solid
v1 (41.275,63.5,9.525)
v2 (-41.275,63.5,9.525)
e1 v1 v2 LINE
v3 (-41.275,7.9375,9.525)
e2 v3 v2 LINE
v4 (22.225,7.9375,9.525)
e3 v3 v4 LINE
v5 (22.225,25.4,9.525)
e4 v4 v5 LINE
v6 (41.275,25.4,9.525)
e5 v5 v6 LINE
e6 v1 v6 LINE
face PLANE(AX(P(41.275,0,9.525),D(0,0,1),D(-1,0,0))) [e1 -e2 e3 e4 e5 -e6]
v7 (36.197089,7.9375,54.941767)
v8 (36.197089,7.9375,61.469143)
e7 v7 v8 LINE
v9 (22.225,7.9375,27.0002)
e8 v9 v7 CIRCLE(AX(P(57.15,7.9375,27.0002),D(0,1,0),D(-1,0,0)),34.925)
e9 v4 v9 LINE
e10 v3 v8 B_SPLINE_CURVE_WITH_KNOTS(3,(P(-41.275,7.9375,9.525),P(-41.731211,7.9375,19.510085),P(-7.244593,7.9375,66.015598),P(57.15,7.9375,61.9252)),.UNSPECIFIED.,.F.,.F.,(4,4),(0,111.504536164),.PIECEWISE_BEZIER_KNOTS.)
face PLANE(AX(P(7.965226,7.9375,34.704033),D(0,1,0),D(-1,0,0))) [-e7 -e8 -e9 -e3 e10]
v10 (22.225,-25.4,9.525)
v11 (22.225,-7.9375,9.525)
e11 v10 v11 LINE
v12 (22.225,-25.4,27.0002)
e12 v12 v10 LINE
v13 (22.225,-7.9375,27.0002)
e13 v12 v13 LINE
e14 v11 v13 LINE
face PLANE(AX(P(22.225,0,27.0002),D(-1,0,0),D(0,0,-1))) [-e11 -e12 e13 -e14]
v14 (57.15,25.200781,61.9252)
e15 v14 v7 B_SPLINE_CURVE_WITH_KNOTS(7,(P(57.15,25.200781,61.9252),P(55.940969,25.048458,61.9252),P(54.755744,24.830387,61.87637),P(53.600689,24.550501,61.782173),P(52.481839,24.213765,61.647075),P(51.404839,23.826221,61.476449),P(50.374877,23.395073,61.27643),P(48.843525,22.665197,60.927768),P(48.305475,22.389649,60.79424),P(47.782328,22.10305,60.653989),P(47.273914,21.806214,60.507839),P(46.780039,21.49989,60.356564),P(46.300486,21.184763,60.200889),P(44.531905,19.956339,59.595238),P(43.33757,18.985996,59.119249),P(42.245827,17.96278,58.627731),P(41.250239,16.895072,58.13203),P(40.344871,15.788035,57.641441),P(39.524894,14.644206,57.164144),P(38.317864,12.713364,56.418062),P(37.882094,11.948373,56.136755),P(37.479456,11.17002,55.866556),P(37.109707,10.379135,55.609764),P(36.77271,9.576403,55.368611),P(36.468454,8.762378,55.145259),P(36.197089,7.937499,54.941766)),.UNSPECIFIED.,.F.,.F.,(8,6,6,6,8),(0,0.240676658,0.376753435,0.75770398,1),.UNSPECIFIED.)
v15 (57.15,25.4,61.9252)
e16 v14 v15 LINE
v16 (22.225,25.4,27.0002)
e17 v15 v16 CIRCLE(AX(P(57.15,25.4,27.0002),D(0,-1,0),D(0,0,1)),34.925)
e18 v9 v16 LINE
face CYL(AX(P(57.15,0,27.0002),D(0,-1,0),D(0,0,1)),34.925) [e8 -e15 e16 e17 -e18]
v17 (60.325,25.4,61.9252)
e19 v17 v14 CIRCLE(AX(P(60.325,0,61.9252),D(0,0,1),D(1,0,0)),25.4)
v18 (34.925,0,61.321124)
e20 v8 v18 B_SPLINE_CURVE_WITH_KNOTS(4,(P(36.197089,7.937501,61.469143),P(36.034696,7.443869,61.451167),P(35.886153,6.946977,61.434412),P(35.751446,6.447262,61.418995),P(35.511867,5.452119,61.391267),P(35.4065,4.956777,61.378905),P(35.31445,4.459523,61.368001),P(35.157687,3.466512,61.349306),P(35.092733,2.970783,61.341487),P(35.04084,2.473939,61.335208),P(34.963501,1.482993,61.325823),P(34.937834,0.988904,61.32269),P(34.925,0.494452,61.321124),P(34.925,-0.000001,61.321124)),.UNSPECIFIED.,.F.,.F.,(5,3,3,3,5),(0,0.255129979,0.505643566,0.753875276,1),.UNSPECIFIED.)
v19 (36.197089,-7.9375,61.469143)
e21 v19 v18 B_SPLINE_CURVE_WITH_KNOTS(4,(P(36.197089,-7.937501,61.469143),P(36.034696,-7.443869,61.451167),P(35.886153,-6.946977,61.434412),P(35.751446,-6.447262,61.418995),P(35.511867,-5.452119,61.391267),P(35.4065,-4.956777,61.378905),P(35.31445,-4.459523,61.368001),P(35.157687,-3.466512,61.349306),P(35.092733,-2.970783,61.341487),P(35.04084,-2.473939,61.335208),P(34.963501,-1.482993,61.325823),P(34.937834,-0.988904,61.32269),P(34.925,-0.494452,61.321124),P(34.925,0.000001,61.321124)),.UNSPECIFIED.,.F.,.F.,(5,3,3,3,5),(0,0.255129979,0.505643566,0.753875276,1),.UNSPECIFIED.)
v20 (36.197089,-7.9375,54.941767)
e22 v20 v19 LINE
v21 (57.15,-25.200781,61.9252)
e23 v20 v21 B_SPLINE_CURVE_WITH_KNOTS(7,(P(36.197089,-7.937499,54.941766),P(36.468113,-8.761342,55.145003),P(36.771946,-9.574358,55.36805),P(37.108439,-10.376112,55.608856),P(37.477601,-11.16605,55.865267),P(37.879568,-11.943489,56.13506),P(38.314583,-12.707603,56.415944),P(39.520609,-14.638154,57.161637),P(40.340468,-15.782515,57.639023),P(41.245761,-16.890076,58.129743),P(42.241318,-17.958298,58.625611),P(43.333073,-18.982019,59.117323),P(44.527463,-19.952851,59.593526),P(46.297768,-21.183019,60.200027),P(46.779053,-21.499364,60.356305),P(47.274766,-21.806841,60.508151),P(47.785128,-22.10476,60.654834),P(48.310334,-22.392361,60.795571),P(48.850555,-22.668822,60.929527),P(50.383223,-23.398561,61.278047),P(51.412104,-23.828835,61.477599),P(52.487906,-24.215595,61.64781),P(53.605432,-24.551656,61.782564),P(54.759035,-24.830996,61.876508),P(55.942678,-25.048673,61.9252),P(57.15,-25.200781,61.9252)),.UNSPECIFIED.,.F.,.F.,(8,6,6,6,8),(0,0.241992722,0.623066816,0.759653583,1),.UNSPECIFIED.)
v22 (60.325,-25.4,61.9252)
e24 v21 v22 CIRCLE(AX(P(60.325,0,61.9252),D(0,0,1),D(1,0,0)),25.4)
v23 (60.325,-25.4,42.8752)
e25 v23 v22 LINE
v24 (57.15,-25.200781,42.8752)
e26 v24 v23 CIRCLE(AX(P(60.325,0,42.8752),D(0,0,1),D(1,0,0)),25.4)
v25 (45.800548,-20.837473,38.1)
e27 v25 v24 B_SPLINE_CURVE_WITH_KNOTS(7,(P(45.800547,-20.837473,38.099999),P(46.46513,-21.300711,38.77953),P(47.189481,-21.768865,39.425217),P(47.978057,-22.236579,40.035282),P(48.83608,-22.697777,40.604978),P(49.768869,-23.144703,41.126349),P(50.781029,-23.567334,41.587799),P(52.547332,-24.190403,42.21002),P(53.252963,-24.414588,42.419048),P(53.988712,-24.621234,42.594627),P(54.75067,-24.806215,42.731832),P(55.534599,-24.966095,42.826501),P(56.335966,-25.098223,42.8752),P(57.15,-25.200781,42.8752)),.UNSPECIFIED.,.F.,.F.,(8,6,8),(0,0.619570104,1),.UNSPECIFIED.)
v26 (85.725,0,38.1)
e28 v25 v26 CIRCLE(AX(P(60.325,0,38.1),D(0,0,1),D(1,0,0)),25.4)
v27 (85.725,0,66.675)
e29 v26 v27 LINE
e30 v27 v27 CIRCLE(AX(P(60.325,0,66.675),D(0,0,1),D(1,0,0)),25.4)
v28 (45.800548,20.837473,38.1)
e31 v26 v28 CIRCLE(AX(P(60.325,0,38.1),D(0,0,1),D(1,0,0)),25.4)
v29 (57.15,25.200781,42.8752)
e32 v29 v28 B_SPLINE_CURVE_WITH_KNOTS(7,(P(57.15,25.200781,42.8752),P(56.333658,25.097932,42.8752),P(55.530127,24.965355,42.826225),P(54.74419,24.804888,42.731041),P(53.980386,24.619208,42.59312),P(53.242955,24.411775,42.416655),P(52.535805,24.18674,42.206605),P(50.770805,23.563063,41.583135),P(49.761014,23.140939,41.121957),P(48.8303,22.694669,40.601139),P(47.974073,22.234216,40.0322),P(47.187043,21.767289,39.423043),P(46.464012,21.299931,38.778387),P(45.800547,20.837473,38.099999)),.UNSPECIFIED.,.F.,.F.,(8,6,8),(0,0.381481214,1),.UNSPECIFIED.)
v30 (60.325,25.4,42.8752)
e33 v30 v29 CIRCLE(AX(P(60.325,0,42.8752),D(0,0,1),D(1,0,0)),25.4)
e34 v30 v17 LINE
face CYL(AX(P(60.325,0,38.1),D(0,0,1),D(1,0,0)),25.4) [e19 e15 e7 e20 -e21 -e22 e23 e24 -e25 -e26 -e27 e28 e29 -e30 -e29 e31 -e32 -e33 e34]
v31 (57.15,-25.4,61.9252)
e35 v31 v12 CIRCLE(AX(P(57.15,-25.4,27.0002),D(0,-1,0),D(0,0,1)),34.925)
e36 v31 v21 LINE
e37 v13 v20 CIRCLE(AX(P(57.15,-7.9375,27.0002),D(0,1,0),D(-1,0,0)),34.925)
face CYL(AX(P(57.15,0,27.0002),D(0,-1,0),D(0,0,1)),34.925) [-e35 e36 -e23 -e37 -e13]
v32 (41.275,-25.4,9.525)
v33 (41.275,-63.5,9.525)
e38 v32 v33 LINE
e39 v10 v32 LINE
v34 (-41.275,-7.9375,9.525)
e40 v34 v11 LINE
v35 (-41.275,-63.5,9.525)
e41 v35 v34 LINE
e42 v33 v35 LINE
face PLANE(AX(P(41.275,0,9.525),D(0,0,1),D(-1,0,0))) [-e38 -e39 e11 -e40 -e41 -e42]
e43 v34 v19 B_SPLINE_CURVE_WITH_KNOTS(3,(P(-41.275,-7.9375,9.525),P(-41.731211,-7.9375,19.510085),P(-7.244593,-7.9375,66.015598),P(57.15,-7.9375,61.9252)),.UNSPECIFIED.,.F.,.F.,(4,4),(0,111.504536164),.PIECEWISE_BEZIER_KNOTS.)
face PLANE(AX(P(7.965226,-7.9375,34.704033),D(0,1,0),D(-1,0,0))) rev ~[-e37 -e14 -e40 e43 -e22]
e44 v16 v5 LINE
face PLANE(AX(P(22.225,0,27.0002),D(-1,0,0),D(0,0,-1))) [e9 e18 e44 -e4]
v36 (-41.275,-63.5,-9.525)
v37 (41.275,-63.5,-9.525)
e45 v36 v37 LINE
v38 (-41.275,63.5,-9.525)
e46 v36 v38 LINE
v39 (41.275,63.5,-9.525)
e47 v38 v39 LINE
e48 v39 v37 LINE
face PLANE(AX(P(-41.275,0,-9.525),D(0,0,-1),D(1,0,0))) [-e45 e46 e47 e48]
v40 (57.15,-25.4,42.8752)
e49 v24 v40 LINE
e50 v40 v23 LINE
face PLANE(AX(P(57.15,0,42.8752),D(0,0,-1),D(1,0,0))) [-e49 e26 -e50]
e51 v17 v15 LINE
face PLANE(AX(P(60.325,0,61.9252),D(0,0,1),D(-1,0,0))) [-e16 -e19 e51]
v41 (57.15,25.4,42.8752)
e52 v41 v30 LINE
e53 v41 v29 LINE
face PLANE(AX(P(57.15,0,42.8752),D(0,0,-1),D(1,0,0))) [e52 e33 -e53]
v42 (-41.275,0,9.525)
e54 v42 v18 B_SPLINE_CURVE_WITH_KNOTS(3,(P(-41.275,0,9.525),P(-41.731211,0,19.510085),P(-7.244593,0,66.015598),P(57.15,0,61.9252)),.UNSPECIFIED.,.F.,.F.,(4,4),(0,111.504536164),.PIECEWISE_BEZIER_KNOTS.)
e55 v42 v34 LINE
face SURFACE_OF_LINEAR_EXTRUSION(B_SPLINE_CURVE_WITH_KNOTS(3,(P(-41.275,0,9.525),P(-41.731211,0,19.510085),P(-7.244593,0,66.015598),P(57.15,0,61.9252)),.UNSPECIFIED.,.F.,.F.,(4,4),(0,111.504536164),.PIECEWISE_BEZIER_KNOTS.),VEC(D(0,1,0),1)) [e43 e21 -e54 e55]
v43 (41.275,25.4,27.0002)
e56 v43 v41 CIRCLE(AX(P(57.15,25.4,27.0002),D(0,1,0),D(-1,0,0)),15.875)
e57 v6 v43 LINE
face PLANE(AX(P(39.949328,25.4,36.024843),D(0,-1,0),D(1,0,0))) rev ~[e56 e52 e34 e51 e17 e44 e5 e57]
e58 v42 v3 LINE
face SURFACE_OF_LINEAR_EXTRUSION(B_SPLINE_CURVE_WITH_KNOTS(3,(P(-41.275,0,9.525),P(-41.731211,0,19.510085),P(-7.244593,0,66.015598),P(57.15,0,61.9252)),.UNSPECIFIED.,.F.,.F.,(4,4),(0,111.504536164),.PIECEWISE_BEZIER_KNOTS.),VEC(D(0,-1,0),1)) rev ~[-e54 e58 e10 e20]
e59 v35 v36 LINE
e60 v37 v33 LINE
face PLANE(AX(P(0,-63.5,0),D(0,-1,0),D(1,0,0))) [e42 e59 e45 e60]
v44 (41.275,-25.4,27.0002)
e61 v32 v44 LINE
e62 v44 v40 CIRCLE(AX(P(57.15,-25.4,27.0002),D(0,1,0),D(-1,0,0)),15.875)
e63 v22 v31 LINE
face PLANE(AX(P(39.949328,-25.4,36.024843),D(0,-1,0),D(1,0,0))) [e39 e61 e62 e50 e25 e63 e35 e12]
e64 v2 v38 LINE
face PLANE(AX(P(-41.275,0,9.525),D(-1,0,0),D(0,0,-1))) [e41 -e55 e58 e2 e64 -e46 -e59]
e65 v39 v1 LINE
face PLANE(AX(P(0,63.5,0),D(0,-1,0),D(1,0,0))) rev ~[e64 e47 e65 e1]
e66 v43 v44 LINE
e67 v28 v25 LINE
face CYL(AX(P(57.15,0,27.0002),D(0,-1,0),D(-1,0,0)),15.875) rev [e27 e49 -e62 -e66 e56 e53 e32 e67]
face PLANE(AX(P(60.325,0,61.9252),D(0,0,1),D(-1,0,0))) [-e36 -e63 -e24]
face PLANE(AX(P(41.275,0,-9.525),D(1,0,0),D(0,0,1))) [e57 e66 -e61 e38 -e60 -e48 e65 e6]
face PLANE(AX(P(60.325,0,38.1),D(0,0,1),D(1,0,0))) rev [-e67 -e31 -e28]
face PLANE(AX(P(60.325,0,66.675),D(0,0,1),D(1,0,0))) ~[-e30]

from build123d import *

# Parameters (mm, degrees)
F1_DEPTH = 63.5
F2_DEPTH = 25.4
F3_DEPTH = 7.9375
F0_W     = 25.4
F0_H     = 4.7498
F0_H_2   = 19.05
F0_H_3   = 4.7752


# Not quite as in the source:
# - a feature names something its author has since deleted; it is built from what else it names


with BuildPart() as f1:
    # F0 (on Front) → F1 (new body, symmetric)
    with BuildSketch(Plane.XZ):
        Polygon((-41.275, -9.525), (41.275, -9.525), (41.275, 9.525), (22.225, 9.525), (-41.275, 9.525), align=None)
    extrude(amount=F1_DEPTH, both=True)

    # F0 (on Front) → F2 (join, symmetric)
    with BuildSketch(Plane.XZ):
        with BuildLine():
            Line((22.225, 9.525), (41.275, 9.525))
            Line((41.275, 9.525), (41.275, 27.0002))
            ThreePointArc((41.275, 27.0002), (45.9246798487, 38.2255201513), (57.15, 42.8752))
            Line((57.15, 42.8752), (60.325, 42.8752))
            Line((60.325, 42.8752), (60.325, 61.9252))
            Line((60.325, 61.9252), (57.15, 61.9252))
            ThreePointArc((57.15, 61.9252), (32.4542956671, 51.6959043329), (22.225, 27.0002))
            Line((22.225, 27.0002), (22.225, 9.525))
        make_face()
    extrude(amount=F2_DEPTH, both=True)

    # F0 (on Front) → F3 (join, symmetric)
    with BuildSketch(Plane.XZ):
        with BuildLine():
            add(Edge.make_bspline(
                [(-41.275, 9.525), (-41.7312111626, 19.5100846971), (-7.2445928525, 66.0155981062), (57.15, 61.9252)],
                knots=[0, 0, 0, 0, 111.5045361635, 111.5045361635, 111.5045361635, 111.5045361635], degree=3))
            Line((-41.275, 9.525), (22.225, 9.525))
            Line((22.225, 9.525), (22.225, 27.0002))
            ThreePointArc((22.225, 27.0002), (32.4542956671, 51.6959043329), (57.15, 61.9252))
        make_face()
    extrude(amount=F3_DEPTH, both=True)

    # F0 (on Front) → F4 (revolve)
    with BuildSketch(Plane.XZ):
        with Locations((73.025, 64.3001)):
            Rectangle(F0_W, F0_H)
        with Locations((73.025, 52.4002)):
            Rectangle(F0_W, F0_H_2)
        with Locations((73.025, 40.4876)):
            Rectangle(F0_W, F0_H_3)
    revolve(axis=Axis((60.325, 0, 52.3875), (0, 0, 1)))


solid = f1.part
